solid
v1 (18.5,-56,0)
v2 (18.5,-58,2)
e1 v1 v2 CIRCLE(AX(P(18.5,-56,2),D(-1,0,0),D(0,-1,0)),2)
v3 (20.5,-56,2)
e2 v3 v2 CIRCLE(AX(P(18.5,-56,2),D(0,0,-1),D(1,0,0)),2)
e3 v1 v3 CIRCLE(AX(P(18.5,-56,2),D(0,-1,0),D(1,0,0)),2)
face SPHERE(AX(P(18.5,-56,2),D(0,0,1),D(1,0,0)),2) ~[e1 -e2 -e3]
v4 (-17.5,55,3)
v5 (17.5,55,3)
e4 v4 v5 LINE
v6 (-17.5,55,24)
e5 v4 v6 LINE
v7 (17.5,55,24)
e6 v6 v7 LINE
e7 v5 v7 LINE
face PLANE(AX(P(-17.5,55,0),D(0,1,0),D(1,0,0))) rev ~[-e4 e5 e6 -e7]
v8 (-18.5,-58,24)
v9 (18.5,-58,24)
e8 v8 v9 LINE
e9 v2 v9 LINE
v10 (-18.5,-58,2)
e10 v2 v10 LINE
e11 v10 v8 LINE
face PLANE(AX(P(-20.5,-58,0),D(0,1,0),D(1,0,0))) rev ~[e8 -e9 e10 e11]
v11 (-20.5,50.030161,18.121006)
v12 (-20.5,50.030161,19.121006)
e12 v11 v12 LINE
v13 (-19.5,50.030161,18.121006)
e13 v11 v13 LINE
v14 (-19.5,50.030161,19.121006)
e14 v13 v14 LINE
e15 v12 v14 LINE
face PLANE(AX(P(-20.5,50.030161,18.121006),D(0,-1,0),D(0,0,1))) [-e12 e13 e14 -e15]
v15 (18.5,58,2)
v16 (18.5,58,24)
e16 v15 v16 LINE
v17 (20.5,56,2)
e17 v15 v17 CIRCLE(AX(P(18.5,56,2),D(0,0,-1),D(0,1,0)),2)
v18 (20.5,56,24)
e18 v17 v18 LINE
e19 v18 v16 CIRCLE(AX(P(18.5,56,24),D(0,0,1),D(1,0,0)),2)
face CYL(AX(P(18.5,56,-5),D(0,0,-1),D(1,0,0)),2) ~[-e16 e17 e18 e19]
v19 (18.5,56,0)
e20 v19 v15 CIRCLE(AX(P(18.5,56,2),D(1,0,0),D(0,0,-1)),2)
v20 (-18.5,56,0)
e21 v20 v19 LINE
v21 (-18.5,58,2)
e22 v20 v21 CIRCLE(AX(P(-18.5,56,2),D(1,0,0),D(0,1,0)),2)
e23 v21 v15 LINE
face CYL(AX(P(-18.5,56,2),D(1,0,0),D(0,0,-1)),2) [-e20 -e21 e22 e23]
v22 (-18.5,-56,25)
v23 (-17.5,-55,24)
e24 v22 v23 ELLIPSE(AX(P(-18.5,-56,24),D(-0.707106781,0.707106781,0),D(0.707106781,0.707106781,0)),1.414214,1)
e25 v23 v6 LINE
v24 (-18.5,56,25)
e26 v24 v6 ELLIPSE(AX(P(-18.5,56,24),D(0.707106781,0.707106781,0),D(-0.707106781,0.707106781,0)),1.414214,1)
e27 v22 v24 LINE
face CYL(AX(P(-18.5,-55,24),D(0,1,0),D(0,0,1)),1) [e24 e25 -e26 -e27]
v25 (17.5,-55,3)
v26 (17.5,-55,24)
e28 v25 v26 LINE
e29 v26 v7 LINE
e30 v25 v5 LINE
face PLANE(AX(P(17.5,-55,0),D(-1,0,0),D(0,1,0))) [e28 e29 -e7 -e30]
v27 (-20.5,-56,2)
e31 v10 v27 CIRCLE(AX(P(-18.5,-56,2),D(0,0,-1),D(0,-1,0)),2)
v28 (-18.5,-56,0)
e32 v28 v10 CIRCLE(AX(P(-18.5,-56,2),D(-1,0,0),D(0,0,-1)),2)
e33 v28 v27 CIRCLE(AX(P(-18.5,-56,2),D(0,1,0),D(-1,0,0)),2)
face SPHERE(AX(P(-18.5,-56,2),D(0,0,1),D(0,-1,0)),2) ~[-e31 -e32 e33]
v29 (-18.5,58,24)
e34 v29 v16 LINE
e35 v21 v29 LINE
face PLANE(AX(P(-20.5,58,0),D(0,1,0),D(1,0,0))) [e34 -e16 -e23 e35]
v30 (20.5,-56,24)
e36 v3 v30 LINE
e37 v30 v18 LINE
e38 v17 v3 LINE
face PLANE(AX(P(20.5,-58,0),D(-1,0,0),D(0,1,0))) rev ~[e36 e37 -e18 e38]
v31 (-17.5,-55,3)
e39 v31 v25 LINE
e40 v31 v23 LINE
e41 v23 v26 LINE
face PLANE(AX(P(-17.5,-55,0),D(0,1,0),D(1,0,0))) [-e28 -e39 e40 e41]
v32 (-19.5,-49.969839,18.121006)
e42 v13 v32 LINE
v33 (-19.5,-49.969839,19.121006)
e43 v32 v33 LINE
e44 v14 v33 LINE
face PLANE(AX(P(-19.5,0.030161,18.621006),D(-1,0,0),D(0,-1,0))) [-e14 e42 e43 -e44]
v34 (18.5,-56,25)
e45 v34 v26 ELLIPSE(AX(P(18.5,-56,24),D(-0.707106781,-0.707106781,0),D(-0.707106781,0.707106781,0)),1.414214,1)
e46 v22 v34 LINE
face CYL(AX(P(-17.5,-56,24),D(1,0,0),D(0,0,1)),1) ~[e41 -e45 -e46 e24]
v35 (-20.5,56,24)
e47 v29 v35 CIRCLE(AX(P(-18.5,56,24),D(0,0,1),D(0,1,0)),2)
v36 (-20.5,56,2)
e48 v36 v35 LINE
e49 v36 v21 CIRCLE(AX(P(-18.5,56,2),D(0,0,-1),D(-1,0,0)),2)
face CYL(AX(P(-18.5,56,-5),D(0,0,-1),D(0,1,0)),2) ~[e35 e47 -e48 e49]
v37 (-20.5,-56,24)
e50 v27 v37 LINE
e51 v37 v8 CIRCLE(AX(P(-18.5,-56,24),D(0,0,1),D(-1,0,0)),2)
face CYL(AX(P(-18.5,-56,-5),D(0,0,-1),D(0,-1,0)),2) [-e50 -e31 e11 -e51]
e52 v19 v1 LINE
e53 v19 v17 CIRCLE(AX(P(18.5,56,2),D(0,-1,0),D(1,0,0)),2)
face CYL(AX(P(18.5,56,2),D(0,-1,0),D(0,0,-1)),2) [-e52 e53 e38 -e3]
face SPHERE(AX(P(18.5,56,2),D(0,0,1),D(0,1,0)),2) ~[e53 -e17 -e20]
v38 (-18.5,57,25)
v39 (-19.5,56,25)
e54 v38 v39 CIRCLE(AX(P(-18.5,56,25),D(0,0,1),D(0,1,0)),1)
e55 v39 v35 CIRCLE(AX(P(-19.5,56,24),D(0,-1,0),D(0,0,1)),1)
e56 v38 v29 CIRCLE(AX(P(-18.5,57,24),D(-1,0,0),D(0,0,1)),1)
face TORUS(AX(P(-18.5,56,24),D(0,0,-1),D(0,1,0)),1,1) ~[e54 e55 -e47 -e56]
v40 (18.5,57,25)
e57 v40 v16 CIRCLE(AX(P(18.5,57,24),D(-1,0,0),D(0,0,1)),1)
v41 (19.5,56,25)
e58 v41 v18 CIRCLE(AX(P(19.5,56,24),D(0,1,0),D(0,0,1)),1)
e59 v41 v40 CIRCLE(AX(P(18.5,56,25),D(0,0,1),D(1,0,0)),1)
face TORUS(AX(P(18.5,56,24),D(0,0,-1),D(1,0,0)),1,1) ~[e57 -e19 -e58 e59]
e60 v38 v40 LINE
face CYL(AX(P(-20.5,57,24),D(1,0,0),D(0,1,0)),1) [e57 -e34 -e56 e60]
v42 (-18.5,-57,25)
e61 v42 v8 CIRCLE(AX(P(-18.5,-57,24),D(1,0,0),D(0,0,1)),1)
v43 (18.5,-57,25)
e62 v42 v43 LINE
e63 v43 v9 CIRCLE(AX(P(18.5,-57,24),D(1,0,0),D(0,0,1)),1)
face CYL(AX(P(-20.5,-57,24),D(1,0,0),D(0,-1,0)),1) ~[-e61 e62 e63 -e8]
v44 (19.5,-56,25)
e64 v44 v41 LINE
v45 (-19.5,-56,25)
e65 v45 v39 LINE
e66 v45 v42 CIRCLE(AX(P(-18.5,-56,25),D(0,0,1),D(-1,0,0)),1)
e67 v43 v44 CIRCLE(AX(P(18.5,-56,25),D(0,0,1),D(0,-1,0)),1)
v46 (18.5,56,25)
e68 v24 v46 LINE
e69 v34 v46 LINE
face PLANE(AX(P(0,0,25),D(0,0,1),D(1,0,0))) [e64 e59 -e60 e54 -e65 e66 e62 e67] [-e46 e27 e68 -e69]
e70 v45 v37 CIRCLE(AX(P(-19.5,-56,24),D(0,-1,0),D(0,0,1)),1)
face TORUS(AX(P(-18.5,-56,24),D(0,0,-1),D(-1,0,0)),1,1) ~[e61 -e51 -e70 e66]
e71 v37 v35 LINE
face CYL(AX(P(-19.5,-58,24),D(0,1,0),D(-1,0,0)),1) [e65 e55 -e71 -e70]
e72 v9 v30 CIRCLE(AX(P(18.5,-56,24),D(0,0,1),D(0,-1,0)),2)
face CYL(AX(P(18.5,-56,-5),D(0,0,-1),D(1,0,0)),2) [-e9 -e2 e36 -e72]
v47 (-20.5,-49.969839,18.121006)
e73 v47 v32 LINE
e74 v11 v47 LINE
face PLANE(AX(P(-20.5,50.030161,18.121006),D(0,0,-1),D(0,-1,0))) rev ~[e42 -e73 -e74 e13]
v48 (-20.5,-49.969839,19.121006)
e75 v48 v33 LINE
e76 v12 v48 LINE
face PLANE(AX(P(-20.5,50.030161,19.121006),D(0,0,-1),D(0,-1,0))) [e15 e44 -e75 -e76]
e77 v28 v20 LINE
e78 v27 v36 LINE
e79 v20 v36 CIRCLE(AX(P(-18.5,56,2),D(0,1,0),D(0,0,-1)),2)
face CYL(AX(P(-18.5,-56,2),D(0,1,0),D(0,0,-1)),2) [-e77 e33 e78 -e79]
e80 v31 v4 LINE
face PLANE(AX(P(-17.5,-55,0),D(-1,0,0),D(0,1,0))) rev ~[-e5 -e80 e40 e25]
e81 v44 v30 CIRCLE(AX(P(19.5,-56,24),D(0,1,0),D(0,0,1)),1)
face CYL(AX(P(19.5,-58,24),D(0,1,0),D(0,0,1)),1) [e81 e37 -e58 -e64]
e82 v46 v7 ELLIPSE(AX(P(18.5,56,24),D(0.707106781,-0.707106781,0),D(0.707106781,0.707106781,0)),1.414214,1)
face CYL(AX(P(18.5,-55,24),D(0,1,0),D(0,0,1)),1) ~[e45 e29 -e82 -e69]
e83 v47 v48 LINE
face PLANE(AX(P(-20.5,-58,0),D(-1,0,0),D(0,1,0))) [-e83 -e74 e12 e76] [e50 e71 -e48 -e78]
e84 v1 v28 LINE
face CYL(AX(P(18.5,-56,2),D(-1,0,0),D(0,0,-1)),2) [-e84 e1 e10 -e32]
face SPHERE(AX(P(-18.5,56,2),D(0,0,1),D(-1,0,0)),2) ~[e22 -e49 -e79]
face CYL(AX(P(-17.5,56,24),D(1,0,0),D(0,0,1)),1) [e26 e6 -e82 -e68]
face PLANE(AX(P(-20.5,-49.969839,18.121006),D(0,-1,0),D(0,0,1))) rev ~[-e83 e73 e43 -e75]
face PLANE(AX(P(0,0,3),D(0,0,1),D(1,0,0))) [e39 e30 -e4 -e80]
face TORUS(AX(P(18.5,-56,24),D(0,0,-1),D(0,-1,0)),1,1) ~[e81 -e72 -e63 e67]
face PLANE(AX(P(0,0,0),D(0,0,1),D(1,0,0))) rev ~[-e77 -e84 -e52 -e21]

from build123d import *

# Parameters (mm, degrees)
F0_W         = 35
F0_H         = 110
F1_DEPTH     = 3
F2_W         = 41
F2_H         = 116
F2_W_2       = 35
F2_H_2       = 110
F3_DEPTH     = 25
F4_R         = 1
F5_T1_DEPTH  = 30
F5_T4_ANGLE  = 90
F5_T6_ANGLE  = 90
F5_T8_ANGLE  = 90
F5_T10_ANGLE = 90
F7_W         = 100
F7_H         = 1
F8_DEPTH     = 1
F9_R         = 2


# Not quite as in the source:
# - a fillet or chamfer that OpenCascade refuses, or shapes differently, is made with other operations: its cross-section is extruded or revolved along the edge and cut away or added


with BuildPart() as f1:
    # F0 (on Top) → F1 (new body)
    with BuildSketch(Plane.XY):
        Rectangle(F0_W, F0_H)
    extrude(amount=F1_DEPTH)

    # F2 (on Top) → F3 (join)
    with BuildSketch(Plane.XY):
        Rectangle(F2_W, F2_H)
        Rectangle(F2_W_2, F2_H_2, mode=Mode.SUBTRACT)
    extrude(amount=F3_DEPTH)

    # F4
    f4_edges = [f1.edges().sort_by_distance(p)[0] for p in [
        (20.5, 0, 25),
        (0, 58, 25),
        (-20.5, 0, 25),
        (0, -58, 25),
        (-17.5, 0, 25),
        (0, 55, 25),
        (17.5, 0, 25),
        (0, -55, 25),
    ]]
    fillet(f4_edges, radius=F4_R)

    # F5: fillet of radius 2 on 4 edges, made by hand

    # F5_s2 → F5_t1 (cut)
    with BuildSketch(Plane.XY.offset(-5)):
        with BuildLine():
            ThreePointArc((20.5, -56), (19.9142135624, -57.4142135624), (18.5, -58))
            Line((18.5, -58), (20.5, -58))
            Line((20.5, -58), (20.5, -56))
        make_face()
        with BuildLine():
            ThreePointArc((-18.5, -58), (-19.9142135624, -57.4142135624), (-20.5, -56))
            Line((-20.5, -56), (-20.5, -58))
            Line((-20.5, -58), (-18.5, -58))
        make_face()
        with BuildLine():
            ThreePointArc((-18.5, 58), (-19.9142135624, 57.4142135624), (-20.5, 56))
            Line((-20.5, 56), (-20.5, 58))
            Line((-20.5, 58), (-18.5, 58))
        make_face()
        with BuildLine():
            ThreePointArc((20.5, 56), (19.9142135624, 57.4142135624), (18.5, 58))
            Line((18.5, 58), (20.5, 58))
            Line((20.5, 58), (20.5, 56))
        make_face()
    extrude(amount=F5_T1_DEPTH, mode=Mode.SUBTRACT)

    # F5_s3 → F5_t4 (revolve, cut)
    with BuildSketch(Plane.XZ.offset(-56)):
        with BuildLine():
            ThreePointArc((19.5, 25), (20.2071067812, 24.7071067812), (20.5, 24))
            Line((20.5, 24), (20.5, 25))
            Line((20.5, 25), (19.5, 25))
        make_face()
    revolve(axis=Axis((18.5, 56, 25), (0, 0, 1)), revolution_arc=F5_T4_ANGLE, mode=Mode.SUBTRACT)

    # F5_s5 → F5_t6 (revolve, cut)
    with BuildSketch(Plane.YZ.offset(-18.5)):
        with BuildLine():
            ThreePointArc((57, 25), (57.7071067812, 24.7071067812), (58, 24))
            Line((58, 24), (58, 25))
            Line((58, 25), (57, 25))
        make_face()
    revolve(axis=Axis((-18.5, 56, 25), (0, 0, 1)), revolution_arc=F5_T6_ANGLE, mode=Mode.SUBTRACT)

    # F5_s7 → F5_t8 (revolve, cut)
    with BuildSketch(Plane.XZ.offset(56)):
        with BuildLine():
            ThreePointArc((-19.5, 25), (-20.2071067812, 24.7071067812), (-20.5, 24))
            Line((-20.5, 24), (-20.5, 25))
            Line((-20.5, 25), (-19.5, 25))
        make_face()
    revolve(axis=Axis((-18.5, -56, 25), (0, 0, 1)), revolution_arc=F5_T8_ANGLE, mode=Mode.SUBTRACT)

    # F5_s9 → F5_t10 (revolve, cut)
    with BuildSketch(Plane.YZ.offset(18.5)):
        with BuildLine():
            ThreePointArc((-57, 25), (-57.7071067812, 24.7071067812), (-58, 24))
            Line((-58, 24), (-58, 25))
            Line((-58, 25), (-57, 25))
        make_face()
    revolve(axis=Axis((18.5, -56, 25), (0, 0, 1)), revolution_arc=F5_T10_ANGLE, mode=Mode.SUBTRACT)

    # F7 (on face) → F8 (cut)
    with BuildSketch(Plane(origin=(-20.5, 0, 0), x_dir=(0, -1, 0), z_dir=(-1, 0, 0))):
        with Locations((-0.0301606953, 18.6210061312)):
            Rectangle(F7_W, F7_H)
    extrude(amount=-F8_DEPTH, mode=Mode.SUBTRACT)

    # F9
    f9_edges = [f1.edges().sort_by_distance(p)[0] for p in [
        (19.914214, -57.414214, 0),
        (0, -58, 0),
        (-19.914214, -57.414214, 0),
        (-20.5, 0, 0),
        (-19.914214, 57.414214, 0),
        (0, 58, 0),
        (19.914214, 57.414214, 0),
        (20.5, 0, 0),
    ]]
    fillet(f9_edges, radius=F9_R)


solid = f1.part
